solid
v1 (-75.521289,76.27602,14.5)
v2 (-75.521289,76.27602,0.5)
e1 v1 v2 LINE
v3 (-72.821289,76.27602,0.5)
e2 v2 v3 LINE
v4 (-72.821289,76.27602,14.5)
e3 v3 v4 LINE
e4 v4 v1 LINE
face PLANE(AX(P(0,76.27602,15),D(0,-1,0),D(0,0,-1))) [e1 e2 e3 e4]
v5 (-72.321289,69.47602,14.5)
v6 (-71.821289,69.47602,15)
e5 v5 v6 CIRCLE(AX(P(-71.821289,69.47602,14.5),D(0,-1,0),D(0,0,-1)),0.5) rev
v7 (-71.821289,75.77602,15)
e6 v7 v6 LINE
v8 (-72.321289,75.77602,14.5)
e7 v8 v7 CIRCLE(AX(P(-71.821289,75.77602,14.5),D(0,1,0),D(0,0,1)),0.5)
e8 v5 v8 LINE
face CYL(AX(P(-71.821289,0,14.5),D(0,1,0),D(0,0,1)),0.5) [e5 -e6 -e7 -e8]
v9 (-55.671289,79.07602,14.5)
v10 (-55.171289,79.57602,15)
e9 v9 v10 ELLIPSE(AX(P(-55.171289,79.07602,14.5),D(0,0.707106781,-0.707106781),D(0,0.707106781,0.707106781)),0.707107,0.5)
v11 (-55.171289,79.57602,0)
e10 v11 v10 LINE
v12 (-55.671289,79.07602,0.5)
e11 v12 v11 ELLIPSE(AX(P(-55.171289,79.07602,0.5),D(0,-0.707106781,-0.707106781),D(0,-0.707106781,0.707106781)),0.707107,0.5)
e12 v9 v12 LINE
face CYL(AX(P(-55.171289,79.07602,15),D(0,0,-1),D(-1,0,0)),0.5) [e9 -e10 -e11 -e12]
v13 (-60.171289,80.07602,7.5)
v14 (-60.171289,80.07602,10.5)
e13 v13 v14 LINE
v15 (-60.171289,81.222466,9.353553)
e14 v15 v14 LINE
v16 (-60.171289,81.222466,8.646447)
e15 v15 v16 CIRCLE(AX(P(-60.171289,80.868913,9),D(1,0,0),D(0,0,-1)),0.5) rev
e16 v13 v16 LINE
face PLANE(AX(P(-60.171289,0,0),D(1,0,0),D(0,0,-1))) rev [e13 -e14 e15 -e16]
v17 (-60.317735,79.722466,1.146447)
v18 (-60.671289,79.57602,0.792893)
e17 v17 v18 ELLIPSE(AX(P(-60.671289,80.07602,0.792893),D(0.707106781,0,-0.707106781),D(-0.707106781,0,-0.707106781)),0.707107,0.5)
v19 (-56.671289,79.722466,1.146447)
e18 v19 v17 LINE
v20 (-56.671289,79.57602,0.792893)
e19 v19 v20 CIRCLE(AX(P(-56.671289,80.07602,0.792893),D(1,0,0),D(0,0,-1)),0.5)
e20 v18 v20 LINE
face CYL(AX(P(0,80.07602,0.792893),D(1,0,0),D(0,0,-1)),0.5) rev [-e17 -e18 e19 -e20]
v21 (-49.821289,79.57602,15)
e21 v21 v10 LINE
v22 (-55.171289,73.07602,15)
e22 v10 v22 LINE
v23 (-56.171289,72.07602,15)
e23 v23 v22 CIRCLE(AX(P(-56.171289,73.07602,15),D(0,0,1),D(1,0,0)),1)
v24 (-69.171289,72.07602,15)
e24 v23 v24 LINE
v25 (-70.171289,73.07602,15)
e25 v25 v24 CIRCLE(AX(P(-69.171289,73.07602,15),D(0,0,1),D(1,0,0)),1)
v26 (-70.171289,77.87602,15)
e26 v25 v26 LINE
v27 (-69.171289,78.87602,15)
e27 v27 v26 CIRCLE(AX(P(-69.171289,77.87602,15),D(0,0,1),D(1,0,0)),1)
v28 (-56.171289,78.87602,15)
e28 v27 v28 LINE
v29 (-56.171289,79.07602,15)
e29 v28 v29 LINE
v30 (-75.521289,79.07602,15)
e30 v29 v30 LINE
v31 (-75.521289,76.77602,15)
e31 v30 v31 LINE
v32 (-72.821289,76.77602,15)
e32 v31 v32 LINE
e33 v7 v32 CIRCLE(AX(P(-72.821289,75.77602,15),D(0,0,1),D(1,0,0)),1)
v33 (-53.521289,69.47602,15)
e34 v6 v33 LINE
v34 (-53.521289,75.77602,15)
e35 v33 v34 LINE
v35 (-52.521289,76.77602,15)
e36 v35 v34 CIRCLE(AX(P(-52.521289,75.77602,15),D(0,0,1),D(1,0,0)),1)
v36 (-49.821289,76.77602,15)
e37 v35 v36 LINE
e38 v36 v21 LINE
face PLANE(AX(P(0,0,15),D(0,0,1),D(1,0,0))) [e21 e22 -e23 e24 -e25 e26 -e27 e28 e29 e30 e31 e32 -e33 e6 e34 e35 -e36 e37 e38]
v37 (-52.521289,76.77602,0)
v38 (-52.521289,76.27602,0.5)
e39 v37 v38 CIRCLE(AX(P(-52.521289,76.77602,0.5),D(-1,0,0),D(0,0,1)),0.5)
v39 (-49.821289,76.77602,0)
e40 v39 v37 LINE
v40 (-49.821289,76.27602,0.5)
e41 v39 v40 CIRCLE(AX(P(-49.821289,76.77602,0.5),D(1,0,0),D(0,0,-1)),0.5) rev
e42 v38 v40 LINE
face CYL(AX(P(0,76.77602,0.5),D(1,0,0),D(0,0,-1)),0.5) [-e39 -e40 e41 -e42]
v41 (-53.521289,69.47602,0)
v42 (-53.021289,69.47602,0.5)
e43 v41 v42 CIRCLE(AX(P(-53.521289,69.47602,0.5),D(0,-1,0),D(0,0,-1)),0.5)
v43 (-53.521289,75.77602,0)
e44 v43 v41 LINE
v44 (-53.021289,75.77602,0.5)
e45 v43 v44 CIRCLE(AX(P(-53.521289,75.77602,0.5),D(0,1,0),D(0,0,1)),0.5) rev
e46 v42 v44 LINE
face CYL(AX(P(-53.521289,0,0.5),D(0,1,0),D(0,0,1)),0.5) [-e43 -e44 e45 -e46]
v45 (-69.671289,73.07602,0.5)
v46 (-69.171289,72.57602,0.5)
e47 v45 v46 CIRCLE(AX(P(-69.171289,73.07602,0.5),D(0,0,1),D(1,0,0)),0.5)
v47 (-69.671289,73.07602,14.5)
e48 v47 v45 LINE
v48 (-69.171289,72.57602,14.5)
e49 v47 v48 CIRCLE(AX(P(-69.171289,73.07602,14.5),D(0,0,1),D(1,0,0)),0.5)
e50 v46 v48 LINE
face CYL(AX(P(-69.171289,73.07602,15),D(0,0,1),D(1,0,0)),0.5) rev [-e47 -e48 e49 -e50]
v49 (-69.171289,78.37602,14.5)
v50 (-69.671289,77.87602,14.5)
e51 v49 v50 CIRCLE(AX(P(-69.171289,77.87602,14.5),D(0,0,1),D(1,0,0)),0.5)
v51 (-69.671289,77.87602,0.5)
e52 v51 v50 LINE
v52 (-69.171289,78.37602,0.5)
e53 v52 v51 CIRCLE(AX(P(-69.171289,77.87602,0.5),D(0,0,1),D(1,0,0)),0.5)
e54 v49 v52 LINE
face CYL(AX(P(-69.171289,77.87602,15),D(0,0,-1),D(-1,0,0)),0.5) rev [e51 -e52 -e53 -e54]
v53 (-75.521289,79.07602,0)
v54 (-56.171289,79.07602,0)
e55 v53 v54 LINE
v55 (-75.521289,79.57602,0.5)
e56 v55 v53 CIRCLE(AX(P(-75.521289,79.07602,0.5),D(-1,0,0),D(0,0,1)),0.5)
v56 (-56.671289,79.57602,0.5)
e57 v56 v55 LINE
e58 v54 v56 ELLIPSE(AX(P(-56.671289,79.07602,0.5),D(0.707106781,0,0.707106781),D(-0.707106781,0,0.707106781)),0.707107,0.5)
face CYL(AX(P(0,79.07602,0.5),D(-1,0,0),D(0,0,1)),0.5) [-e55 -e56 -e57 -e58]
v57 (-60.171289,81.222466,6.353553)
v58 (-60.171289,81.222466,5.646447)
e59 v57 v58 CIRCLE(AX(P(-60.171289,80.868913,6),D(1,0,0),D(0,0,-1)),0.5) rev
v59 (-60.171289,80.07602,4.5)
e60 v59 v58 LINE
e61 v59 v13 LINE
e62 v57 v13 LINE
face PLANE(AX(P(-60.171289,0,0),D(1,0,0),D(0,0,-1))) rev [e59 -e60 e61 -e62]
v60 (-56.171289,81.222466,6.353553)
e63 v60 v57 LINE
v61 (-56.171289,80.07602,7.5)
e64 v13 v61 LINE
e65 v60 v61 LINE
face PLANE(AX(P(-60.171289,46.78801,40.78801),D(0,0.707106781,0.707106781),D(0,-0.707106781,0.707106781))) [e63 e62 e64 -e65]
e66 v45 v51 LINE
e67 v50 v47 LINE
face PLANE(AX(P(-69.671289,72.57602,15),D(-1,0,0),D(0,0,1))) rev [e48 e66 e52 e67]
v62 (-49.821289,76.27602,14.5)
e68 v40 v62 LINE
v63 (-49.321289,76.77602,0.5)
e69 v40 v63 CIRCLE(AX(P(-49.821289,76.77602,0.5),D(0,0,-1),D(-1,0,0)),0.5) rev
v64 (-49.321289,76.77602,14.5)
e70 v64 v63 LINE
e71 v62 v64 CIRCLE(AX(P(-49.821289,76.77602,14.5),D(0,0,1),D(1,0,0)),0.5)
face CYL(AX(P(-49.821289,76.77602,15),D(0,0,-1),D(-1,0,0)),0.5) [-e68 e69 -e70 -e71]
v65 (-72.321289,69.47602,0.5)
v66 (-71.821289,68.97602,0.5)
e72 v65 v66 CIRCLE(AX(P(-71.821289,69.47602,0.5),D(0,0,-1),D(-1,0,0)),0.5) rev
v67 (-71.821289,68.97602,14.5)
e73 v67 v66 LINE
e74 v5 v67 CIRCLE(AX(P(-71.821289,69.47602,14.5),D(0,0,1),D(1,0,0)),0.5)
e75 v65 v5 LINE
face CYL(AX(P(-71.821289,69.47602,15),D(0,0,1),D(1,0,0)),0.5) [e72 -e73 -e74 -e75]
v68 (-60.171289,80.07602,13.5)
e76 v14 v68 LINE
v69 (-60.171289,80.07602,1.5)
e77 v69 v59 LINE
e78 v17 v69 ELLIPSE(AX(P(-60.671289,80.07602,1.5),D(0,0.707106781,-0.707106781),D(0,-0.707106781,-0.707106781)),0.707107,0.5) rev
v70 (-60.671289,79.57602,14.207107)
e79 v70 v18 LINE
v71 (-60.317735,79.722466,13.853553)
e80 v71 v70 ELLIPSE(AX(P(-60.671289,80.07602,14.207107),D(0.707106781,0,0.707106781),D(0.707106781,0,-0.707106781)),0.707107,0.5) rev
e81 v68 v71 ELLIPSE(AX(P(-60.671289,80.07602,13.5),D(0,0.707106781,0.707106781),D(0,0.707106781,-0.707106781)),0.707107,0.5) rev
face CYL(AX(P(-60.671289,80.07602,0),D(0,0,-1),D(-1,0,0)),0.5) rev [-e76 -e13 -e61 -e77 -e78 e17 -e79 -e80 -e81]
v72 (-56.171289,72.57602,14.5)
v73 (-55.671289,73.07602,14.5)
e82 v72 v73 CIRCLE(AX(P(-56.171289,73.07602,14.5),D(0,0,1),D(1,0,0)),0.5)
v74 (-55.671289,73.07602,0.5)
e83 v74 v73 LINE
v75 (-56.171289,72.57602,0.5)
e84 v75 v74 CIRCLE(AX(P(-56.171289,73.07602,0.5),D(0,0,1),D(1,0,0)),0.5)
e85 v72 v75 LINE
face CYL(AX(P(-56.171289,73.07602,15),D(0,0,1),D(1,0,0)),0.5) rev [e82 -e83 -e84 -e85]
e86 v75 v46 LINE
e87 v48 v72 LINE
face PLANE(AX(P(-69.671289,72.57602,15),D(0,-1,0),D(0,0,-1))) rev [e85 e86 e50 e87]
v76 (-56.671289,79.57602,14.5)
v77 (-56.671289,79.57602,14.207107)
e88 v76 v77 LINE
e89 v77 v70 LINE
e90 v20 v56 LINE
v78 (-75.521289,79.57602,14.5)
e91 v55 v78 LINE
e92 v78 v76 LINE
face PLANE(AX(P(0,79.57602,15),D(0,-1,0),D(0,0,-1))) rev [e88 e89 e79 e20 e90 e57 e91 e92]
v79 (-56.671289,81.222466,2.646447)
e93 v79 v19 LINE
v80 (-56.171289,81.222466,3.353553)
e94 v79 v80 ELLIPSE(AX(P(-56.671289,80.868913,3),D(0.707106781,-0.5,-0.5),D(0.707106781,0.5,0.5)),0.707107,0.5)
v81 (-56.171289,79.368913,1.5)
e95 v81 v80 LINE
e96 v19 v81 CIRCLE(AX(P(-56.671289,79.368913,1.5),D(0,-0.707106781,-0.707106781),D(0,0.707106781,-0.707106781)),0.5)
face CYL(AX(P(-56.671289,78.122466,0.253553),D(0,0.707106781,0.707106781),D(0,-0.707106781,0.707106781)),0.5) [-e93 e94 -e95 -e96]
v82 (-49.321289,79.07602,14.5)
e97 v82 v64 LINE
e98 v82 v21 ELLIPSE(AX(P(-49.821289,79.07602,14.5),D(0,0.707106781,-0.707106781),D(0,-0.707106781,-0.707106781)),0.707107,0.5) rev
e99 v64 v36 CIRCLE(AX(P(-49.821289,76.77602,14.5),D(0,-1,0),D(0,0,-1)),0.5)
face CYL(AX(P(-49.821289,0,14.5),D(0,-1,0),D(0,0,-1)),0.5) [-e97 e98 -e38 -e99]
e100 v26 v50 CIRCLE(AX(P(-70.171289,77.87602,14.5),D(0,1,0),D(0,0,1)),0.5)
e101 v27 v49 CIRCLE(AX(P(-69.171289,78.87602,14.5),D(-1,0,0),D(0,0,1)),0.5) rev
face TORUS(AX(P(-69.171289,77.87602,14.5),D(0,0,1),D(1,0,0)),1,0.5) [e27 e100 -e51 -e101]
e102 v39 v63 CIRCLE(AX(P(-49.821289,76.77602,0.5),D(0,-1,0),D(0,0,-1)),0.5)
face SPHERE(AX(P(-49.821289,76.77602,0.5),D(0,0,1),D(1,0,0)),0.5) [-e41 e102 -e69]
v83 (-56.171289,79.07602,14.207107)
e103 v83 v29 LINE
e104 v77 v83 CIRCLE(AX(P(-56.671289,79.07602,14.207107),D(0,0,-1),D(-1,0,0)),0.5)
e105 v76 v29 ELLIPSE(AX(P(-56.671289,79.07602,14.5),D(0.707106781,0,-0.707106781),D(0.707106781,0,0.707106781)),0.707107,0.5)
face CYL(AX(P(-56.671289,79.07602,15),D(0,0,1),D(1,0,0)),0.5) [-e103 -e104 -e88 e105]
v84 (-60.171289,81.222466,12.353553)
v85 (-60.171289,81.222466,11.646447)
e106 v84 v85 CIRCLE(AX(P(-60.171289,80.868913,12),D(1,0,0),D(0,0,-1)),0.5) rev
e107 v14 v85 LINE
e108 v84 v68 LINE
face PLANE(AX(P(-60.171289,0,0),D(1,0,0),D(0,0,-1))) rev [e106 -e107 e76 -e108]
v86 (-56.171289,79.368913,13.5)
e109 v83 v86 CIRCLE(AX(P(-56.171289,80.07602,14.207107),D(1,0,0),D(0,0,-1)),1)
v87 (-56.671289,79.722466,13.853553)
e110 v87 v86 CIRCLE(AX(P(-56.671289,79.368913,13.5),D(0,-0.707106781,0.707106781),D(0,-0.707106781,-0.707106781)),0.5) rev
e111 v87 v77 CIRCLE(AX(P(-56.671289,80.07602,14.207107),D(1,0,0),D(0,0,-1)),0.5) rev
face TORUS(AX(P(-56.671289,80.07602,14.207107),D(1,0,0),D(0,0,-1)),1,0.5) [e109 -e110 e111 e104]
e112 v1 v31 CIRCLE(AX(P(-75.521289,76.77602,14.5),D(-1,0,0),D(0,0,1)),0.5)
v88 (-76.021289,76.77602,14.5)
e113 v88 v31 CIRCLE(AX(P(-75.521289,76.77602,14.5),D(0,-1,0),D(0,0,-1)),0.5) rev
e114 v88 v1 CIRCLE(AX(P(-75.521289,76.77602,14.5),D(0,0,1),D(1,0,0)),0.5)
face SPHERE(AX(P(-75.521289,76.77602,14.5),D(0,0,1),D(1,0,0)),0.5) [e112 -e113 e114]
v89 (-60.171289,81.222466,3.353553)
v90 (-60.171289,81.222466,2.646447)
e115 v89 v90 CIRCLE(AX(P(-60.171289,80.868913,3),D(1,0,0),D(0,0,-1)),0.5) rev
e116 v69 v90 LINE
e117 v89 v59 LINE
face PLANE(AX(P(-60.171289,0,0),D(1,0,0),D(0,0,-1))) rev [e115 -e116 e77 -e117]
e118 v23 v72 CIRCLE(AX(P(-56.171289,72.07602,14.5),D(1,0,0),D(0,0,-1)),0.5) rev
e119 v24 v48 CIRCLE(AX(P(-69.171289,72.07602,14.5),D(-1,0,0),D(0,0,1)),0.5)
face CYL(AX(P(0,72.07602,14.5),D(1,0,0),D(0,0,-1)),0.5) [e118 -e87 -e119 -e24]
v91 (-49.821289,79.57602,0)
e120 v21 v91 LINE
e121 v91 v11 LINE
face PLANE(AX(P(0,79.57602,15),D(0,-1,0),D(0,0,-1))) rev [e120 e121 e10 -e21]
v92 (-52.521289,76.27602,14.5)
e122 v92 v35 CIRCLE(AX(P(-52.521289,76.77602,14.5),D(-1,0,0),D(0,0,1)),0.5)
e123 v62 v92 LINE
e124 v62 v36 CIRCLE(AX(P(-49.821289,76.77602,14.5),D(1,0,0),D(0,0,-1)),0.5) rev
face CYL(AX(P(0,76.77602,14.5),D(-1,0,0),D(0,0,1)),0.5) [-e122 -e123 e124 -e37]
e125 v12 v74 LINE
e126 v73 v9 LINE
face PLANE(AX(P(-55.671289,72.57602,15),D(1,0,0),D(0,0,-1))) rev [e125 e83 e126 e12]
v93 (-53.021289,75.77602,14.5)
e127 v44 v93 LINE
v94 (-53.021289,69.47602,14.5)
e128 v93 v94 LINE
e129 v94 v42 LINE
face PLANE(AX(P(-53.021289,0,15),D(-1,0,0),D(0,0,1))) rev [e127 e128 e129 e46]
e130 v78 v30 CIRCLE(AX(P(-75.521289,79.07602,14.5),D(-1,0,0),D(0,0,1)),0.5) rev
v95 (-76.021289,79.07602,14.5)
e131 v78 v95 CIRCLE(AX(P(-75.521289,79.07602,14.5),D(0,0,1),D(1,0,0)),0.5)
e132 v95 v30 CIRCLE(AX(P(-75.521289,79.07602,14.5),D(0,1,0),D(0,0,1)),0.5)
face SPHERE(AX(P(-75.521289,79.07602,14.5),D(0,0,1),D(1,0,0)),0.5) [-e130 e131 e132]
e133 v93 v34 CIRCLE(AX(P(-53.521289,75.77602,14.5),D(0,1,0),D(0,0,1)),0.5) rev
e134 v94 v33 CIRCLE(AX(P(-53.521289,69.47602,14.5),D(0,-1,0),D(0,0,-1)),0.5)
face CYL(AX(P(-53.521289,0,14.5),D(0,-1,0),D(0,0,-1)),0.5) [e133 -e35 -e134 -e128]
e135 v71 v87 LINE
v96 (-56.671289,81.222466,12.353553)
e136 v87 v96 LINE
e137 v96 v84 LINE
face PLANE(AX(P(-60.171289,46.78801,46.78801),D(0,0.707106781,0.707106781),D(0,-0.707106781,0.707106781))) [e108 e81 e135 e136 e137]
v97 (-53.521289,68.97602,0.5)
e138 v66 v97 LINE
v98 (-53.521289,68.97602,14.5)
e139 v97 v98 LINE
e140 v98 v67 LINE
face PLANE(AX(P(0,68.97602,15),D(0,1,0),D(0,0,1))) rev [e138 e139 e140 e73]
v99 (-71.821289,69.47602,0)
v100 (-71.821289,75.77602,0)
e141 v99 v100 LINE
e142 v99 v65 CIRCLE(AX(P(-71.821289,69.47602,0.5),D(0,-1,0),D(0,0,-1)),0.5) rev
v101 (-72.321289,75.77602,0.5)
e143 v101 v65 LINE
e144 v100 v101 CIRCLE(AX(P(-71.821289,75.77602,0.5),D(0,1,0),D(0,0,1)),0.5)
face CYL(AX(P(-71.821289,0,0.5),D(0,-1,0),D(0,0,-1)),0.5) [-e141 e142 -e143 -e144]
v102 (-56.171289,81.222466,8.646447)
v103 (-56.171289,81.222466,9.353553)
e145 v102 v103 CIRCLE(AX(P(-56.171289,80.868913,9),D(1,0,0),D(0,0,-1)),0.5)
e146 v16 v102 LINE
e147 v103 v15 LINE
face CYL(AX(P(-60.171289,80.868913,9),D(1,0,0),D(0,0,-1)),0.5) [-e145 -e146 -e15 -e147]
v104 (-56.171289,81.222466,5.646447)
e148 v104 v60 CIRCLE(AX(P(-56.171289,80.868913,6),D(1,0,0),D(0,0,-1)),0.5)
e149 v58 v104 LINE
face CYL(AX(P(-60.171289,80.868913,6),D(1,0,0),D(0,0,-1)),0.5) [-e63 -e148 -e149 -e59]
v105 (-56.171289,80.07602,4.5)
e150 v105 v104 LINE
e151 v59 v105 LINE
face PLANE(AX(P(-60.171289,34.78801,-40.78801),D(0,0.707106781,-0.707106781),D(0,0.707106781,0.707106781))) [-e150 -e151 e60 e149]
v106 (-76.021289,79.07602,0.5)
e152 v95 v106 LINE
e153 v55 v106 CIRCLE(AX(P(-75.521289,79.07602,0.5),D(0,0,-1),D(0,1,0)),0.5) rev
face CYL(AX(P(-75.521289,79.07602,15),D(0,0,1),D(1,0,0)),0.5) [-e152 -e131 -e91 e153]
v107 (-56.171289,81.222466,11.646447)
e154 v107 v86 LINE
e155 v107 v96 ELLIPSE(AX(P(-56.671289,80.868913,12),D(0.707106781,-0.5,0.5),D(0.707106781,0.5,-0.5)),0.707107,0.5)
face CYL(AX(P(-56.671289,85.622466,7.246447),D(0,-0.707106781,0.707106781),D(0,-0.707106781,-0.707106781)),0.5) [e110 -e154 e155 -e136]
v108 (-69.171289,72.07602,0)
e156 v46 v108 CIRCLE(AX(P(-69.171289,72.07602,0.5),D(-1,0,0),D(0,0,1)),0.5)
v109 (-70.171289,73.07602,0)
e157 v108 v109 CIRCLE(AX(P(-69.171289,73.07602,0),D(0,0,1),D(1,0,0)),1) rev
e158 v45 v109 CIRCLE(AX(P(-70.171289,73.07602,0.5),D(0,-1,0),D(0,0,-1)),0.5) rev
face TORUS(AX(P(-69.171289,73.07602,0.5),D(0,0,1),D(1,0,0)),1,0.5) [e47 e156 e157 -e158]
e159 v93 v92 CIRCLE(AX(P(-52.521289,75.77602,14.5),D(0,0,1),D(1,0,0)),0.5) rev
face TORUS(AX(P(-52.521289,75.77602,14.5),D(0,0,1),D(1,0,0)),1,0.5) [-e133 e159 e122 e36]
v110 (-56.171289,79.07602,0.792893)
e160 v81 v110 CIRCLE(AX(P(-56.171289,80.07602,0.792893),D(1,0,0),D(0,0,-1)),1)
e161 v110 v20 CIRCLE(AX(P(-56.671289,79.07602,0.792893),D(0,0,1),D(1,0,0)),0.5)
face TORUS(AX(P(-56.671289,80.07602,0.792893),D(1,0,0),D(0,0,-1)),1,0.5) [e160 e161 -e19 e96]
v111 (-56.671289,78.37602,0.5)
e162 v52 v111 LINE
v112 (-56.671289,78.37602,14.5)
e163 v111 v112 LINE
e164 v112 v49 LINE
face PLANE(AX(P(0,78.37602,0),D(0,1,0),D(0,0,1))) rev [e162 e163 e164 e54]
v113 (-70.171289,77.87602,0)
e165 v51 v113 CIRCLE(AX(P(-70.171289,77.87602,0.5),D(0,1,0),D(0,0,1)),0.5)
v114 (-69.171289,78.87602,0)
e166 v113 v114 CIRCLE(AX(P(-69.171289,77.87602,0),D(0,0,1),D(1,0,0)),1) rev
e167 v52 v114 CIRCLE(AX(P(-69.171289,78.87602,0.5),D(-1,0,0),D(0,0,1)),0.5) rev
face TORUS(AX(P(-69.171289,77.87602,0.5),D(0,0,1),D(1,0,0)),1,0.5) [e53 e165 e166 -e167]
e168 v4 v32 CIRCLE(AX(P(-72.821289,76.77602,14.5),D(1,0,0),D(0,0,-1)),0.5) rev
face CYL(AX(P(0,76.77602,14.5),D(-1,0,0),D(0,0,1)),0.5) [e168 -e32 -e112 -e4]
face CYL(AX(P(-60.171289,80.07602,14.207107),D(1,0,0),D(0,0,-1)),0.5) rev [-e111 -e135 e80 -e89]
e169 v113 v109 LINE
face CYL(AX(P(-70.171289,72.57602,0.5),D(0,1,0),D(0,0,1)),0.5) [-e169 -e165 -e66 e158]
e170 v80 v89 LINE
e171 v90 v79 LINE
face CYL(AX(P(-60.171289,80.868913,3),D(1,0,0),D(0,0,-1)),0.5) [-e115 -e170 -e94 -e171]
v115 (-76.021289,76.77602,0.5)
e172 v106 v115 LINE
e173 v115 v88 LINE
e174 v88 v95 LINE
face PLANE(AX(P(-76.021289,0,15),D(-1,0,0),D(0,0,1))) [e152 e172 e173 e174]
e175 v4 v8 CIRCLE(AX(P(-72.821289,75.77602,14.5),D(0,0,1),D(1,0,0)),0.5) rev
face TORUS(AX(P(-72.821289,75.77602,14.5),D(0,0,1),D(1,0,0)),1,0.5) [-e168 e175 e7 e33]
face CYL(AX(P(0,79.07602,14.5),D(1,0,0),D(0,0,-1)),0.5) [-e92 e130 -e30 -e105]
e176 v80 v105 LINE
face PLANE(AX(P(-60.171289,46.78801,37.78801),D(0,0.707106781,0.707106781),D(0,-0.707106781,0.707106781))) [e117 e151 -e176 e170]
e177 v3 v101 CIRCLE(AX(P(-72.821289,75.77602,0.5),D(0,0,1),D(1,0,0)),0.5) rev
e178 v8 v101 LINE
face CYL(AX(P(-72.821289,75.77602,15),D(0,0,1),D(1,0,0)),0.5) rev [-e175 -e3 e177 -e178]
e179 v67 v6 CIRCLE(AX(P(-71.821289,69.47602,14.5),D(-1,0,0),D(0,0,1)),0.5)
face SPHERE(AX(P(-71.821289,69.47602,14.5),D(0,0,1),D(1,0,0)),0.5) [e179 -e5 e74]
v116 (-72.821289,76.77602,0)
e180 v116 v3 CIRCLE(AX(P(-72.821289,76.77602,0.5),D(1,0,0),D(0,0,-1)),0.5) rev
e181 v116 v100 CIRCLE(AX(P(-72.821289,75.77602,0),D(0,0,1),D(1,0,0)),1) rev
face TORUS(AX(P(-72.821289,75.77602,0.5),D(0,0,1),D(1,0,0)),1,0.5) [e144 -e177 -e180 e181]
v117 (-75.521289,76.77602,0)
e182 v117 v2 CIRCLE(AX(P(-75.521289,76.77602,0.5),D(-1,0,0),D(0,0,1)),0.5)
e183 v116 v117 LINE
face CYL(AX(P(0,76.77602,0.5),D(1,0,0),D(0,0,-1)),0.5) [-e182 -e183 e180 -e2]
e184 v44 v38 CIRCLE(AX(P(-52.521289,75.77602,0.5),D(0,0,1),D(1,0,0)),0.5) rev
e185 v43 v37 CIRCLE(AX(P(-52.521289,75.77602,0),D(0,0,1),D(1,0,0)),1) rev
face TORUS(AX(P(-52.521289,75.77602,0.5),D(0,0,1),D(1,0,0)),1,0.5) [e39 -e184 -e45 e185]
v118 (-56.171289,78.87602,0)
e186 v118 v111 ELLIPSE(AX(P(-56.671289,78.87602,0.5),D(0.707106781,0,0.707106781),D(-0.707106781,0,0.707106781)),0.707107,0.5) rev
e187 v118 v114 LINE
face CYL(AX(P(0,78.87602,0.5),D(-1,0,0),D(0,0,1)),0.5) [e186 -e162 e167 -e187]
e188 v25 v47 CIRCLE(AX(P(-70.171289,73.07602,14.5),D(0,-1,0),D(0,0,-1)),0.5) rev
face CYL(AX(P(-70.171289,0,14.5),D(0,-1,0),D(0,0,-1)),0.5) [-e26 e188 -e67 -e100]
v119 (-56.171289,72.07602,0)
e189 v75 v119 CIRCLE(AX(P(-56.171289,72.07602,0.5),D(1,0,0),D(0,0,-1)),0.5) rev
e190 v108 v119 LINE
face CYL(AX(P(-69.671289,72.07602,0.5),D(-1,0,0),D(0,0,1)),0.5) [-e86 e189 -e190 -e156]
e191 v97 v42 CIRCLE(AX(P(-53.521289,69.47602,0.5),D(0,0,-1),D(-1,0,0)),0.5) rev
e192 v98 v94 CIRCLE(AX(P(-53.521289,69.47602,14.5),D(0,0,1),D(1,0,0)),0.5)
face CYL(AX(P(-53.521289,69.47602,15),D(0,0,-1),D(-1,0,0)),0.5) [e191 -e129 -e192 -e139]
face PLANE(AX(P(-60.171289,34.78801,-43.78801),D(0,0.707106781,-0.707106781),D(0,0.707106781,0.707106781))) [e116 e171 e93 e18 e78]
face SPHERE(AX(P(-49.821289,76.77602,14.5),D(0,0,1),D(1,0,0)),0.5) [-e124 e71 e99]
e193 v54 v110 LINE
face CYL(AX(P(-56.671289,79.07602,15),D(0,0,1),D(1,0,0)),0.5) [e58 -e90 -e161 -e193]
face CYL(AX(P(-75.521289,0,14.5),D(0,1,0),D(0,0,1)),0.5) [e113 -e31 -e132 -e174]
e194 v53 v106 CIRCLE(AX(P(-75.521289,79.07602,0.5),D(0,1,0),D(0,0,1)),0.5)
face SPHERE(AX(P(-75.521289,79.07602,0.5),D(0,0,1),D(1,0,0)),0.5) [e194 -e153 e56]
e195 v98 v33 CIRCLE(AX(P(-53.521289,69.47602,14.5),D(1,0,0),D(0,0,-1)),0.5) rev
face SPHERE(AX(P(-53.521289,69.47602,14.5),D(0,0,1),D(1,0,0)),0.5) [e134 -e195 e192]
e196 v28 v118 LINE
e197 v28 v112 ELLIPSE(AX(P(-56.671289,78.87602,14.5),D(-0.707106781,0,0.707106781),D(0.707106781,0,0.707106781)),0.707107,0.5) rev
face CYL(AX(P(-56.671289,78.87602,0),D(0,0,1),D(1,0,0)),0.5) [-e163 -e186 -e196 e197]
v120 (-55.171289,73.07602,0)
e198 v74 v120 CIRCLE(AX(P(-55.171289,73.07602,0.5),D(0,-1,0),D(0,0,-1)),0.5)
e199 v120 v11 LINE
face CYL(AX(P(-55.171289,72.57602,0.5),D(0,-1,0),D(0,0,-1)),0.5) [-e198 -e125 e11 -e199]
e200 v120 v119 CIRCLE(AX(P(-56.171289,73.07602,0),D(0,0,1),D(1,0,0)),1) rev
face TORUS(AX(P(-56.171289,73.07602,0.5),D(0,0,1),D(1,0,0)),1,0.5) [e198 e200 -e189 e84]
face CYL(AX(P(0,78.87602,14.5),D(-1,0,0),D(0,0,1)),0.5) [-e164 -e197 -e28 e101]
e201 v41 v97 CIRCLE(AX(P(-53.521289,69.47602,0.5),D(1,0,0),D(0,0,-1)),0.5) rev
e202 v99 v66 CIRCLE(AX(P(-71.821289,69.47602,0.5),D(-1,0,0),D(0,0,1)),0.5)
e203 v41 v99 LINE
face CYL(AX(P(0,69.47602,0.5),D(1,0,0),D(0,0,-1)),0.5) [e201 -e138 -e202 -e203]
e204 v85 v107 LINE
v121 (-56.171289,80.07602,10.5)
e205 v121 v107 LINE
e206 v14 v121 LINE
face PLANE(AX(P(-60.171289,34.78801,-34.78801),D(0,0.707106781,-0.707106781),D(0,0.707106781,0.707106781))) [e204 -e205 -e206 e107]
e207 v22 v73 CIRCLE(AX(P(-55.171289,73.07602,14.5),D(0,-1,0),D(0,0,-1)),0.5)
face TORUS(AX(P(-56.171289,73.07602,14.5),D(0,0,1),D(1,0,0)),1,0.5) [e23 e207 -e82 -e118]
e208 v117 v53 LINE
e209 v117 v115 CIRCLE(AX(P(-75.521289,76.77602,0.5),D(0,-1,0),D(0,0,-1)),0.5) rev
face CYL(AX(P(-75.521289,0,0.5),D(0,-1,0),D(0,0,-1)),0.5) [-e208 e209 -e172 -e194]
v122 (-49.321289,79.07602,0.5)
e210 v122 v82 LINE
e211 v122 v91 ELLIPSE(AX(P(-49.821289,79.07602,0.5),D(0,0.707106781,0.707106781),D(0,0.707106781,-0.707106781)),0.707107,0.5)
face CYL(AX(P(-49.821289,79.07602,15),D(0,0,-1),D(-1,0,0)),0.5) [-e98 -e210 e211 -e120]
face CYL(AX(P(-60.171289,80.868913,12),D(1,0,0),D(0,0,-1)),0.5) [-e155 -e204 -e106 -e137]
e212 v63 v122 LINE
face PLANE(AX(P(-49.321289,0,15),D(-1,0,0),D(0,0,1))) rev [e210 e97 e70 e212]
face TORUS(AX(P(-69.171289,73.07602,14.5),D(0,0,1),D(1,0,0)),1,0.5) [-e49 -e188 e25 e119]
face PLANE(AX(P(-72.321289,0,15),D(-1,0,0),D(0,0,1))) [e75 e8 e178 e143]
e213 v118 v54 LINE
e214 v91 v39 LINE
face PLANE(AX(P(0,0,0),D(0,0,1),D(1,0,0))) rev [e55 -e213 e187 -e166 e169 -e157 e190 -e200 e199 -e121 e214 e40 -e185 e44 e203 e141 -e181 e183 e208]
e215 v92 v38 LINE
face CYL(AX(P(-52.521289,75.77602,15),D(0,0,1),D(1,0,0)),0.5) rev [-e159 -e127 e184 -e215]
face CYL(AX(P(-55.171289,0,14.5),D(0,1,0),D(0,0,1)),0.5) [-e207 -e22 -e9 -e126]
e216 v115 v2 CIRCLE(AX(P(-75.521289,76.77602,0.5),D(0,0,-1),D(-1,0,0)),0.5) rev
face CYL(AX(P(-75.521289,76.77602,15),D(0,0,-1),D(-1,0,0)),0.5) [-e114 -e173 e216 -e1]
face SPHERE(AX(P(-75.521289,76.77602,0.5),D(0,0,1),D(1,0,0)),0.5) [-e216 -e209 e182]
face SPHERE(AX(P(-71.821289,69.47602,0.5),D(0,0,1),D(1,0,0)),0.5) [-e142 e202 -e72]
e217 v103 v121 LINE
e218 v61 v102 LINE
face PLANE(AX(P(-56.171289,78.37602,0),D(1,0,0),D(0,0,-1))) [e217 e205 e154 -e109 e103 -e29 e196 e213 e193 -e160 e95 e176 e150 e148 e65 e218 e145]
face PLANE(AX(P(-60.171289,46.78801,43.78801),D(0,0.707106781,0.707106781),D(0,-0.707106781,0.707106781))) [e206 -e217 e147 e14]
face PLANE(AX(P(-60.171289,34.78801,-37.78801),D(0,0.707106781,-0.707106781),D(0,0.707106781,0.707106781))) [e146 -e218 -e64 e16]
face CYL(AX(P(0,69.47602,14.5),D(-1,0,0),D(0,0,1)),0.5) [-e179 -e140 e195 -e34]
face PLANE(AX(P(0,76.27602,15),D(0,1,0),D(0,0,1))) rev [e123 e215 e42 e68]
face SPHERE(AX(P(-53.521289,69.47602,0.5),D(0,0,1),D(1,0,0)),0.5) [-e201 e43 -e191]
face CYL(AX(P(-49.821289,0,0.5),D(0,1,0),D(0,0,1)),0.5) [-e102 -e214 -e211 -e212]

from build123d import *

# Parameters (mm, degrees)
SKETCH2_W           = 9.65
SKETCH2_H           = 3.6
BOSS_EXTRUDE1_DEPTH = 15
SKETCH4_W           = 14
SKETCH4_H           = 7
CUT_EXTRUDE1_DEPTH  = 112.070154559
SKETCH5_W           = 13.5
SKETCH5_H           = 15
BOSS_EXTRUDE2_DEPTH = 1.2
SKETCH6_W           = 3
SKETCH6_H           = 0.5
BOSS_EXTRUDE3_DEPTH = 4
LPATTERN1_COUNT     = 4
LPATTERN1_PITCH     = 3
BOSS_EXTRUDE4_DEPTH = 4
FILLET1_R           = 0.5


with BuildPart() as part:
    # Sketch2 → Boss-Extrude1 (new body)
    with BuildSketch(Plane.XY):
        Polygon((-76.021288744, 76.276019576), (-76.021288744, 79.576019576), (-49.321288744, 79.576019576), (-49.321288744, 76.276019576), (-53.021288744, 76.276019576), (-53.021288744, 72.576019576), (-72.321288744, 72.576019576), (-72.321288744, 76.276019576), align=None)
        with Locations((-57.846288744, 70.776019576)):
            Rectangle(SKETCH2_W, SKETCH2_H)
        with Locations((-67.496288744, 70.776019576)):
            Rectangle(SKETCH2_W, SKETCH2_H)
    extrude(amount=BOSS_EXTRUDE1_DEPTH)

    # Sketch4 → Cut-Extrude1 (cut, through all)
    with BuildSketch(Plane(origin=(0, 0, 0), x_dir=(-1, 0, 0), z_dir=(0, 0, -1))):
        with Locations((62.671288744, 76.076019576)):
            Rectangle(SKETCH4_W, SKETCH4_H)
    extrude(amount=-CUT_EXTRUDE1_DEPTH, mode=Mode.SUBTRACT)

    # Sketch5 → Boss-Extrude2 (add)
    with BuildSketch(Plane(origin=(0, 79.576019576, 0), x_dir=(1, 0, 0), z_dir=(0, 1, 0))):
        with Locations((-62.921288744, -7.5)):
            Rectangle(SKETCH5_W, SKETCH5_H)
    extrude(amount=-BOSS_EXTRUDE2_DEPTH)

    # Sketch6 → Boss-Extrude3 (add)
    with BuildSketch(Plane(origin=(-56.171288744, 0, 0), x_dir=(0, 0, -1), z_dir=(1, 0, 0))):
        with Locations((-12, 79.826019576)):
            Rectangle(SKETCH6_W, SKETCH6_H)
        Polygon((-10.5, 80.076019576), (-13.5, 80.076019576), (-12, 81.576019576), align=None)
    boss_extrude3 = extrude(amount=-BOSS_EXTRUDE3_DEPTH)

    # LPattern1: Boss-Extrude3 ×4
    with Locations(*[(0, 0, -i * LPATTERN1_PITCH) for i in range(1, LPATTERN1_COUNT)]):
        add(boss_extrude3)

    # Sketch7 → Boss-Extrude4 (add)
    with BuildSketch(Plane(origin=(-56.171288744, 0, 0), x_dir=(0, 0, -1), z_dir=(1, 0, 0))):
        Polygon((-13.5, 80.076019576), (-13.5, 79.576019576), (-14, 79.576019576), align=None)
        Polygon((-1.5, 80.076019576), (-1.5, 79.576019576), (-1, 79.576019576), align=None)
    extrude(amount=-BOSS_EXTRUDE4_DEPTH)

    # Fillet1
    fillet1_edges = [part.edges().sort_by_distance(p)[0] for p in [
        (-76.021288744, 76.276019576, 7.5),
        (-76.021288744, 79.576019576, 7.5),
        (-76.021288744, 77.926019576, 0),
        (-76.021288744, 77.926019576, 15),
        (-74.171288744, 76.276019576, 15),
        (-66.096288744, 79.576019576, 15),
        (-62.921288744, 78.376019576, 15),
        (-69.671288744, 75.476019576, 15),
        (-62.671288744, 72.576019576, 15),
        (-55.671288744, 76.076019576, 15),
        (-49.321288744, 77.926019576, 15),
        (-51.171288744, 76.276019576, 15),
        (-53.021288744, 72.626019576, 15),
        (-62.671288744, 68.976019576, 15),
        (-72.321288744, 72.626019576, 15),
        (-72.321288744, 76.276019576, 7.5),
        (-72.321288744, 72.626019576, 0),
        (-72.321288744, 68.976019576, 7.5),
        (-53.021288744, 68.976019576, 7.5),
        (-62.671288744, 68.976019576, 0),
        (-53.021288744, 76.276019576, 7.5),
        (-53.021288744, 72.626019576, 0),
        (-49.321288744, 76.276019576, 7.5),
        (-51.171288744, 76.276019576, 0),
        (-49.321288744, 79.576019576, 7.5),
        (-49.321288744, 77.926019576, 0),
        (-55.671288744, 79.576019576, 7.5),
        (-55.671288744, 76.076019576, 0),
        (-55.671288744, 72.576019576, 7.5),
        (-62.671288744, 72.576019576, 0),
        (-69.671288744, 72.576019576, 7.5),
        (-69.671288744, 75.476019576, 0),
        (-69.671288744, 78.376019576, 7.5),
        (-62.921288744, 78.376019576, 0),
        (-56.171288744, 78.376019576, 7.5),
        (-56.171288744, 79.576019576, 14.5),
        (-56.171288744, 80.576019576, 13),
        (-56.171288744, 80.576019576, 2),
        (-56.171288744, 79.576019576, 0.5),
        (-58.171288744, 79.576019576, 1),
        (-58.171288744, 81.576019576, 3),
        (-60.171288744, 79.576019576, 7.5),
        (-58.171288744, 81.576019576, 6),
        (-58.171288744, 81.576019576, 9),
        (-58.171288744, 81.576019576, 12),
        (-58.171288744, 79.576019576, 14),
        (-74.171288744, 76.276019576, 0),
        (-66.096288744, 79.576019576, 0),
    ]]
    fillet(fillet1_edges, radius=FILLET1_R - 0.0001)  # a hair under: the kernel refuses the full size


solid = part.part
